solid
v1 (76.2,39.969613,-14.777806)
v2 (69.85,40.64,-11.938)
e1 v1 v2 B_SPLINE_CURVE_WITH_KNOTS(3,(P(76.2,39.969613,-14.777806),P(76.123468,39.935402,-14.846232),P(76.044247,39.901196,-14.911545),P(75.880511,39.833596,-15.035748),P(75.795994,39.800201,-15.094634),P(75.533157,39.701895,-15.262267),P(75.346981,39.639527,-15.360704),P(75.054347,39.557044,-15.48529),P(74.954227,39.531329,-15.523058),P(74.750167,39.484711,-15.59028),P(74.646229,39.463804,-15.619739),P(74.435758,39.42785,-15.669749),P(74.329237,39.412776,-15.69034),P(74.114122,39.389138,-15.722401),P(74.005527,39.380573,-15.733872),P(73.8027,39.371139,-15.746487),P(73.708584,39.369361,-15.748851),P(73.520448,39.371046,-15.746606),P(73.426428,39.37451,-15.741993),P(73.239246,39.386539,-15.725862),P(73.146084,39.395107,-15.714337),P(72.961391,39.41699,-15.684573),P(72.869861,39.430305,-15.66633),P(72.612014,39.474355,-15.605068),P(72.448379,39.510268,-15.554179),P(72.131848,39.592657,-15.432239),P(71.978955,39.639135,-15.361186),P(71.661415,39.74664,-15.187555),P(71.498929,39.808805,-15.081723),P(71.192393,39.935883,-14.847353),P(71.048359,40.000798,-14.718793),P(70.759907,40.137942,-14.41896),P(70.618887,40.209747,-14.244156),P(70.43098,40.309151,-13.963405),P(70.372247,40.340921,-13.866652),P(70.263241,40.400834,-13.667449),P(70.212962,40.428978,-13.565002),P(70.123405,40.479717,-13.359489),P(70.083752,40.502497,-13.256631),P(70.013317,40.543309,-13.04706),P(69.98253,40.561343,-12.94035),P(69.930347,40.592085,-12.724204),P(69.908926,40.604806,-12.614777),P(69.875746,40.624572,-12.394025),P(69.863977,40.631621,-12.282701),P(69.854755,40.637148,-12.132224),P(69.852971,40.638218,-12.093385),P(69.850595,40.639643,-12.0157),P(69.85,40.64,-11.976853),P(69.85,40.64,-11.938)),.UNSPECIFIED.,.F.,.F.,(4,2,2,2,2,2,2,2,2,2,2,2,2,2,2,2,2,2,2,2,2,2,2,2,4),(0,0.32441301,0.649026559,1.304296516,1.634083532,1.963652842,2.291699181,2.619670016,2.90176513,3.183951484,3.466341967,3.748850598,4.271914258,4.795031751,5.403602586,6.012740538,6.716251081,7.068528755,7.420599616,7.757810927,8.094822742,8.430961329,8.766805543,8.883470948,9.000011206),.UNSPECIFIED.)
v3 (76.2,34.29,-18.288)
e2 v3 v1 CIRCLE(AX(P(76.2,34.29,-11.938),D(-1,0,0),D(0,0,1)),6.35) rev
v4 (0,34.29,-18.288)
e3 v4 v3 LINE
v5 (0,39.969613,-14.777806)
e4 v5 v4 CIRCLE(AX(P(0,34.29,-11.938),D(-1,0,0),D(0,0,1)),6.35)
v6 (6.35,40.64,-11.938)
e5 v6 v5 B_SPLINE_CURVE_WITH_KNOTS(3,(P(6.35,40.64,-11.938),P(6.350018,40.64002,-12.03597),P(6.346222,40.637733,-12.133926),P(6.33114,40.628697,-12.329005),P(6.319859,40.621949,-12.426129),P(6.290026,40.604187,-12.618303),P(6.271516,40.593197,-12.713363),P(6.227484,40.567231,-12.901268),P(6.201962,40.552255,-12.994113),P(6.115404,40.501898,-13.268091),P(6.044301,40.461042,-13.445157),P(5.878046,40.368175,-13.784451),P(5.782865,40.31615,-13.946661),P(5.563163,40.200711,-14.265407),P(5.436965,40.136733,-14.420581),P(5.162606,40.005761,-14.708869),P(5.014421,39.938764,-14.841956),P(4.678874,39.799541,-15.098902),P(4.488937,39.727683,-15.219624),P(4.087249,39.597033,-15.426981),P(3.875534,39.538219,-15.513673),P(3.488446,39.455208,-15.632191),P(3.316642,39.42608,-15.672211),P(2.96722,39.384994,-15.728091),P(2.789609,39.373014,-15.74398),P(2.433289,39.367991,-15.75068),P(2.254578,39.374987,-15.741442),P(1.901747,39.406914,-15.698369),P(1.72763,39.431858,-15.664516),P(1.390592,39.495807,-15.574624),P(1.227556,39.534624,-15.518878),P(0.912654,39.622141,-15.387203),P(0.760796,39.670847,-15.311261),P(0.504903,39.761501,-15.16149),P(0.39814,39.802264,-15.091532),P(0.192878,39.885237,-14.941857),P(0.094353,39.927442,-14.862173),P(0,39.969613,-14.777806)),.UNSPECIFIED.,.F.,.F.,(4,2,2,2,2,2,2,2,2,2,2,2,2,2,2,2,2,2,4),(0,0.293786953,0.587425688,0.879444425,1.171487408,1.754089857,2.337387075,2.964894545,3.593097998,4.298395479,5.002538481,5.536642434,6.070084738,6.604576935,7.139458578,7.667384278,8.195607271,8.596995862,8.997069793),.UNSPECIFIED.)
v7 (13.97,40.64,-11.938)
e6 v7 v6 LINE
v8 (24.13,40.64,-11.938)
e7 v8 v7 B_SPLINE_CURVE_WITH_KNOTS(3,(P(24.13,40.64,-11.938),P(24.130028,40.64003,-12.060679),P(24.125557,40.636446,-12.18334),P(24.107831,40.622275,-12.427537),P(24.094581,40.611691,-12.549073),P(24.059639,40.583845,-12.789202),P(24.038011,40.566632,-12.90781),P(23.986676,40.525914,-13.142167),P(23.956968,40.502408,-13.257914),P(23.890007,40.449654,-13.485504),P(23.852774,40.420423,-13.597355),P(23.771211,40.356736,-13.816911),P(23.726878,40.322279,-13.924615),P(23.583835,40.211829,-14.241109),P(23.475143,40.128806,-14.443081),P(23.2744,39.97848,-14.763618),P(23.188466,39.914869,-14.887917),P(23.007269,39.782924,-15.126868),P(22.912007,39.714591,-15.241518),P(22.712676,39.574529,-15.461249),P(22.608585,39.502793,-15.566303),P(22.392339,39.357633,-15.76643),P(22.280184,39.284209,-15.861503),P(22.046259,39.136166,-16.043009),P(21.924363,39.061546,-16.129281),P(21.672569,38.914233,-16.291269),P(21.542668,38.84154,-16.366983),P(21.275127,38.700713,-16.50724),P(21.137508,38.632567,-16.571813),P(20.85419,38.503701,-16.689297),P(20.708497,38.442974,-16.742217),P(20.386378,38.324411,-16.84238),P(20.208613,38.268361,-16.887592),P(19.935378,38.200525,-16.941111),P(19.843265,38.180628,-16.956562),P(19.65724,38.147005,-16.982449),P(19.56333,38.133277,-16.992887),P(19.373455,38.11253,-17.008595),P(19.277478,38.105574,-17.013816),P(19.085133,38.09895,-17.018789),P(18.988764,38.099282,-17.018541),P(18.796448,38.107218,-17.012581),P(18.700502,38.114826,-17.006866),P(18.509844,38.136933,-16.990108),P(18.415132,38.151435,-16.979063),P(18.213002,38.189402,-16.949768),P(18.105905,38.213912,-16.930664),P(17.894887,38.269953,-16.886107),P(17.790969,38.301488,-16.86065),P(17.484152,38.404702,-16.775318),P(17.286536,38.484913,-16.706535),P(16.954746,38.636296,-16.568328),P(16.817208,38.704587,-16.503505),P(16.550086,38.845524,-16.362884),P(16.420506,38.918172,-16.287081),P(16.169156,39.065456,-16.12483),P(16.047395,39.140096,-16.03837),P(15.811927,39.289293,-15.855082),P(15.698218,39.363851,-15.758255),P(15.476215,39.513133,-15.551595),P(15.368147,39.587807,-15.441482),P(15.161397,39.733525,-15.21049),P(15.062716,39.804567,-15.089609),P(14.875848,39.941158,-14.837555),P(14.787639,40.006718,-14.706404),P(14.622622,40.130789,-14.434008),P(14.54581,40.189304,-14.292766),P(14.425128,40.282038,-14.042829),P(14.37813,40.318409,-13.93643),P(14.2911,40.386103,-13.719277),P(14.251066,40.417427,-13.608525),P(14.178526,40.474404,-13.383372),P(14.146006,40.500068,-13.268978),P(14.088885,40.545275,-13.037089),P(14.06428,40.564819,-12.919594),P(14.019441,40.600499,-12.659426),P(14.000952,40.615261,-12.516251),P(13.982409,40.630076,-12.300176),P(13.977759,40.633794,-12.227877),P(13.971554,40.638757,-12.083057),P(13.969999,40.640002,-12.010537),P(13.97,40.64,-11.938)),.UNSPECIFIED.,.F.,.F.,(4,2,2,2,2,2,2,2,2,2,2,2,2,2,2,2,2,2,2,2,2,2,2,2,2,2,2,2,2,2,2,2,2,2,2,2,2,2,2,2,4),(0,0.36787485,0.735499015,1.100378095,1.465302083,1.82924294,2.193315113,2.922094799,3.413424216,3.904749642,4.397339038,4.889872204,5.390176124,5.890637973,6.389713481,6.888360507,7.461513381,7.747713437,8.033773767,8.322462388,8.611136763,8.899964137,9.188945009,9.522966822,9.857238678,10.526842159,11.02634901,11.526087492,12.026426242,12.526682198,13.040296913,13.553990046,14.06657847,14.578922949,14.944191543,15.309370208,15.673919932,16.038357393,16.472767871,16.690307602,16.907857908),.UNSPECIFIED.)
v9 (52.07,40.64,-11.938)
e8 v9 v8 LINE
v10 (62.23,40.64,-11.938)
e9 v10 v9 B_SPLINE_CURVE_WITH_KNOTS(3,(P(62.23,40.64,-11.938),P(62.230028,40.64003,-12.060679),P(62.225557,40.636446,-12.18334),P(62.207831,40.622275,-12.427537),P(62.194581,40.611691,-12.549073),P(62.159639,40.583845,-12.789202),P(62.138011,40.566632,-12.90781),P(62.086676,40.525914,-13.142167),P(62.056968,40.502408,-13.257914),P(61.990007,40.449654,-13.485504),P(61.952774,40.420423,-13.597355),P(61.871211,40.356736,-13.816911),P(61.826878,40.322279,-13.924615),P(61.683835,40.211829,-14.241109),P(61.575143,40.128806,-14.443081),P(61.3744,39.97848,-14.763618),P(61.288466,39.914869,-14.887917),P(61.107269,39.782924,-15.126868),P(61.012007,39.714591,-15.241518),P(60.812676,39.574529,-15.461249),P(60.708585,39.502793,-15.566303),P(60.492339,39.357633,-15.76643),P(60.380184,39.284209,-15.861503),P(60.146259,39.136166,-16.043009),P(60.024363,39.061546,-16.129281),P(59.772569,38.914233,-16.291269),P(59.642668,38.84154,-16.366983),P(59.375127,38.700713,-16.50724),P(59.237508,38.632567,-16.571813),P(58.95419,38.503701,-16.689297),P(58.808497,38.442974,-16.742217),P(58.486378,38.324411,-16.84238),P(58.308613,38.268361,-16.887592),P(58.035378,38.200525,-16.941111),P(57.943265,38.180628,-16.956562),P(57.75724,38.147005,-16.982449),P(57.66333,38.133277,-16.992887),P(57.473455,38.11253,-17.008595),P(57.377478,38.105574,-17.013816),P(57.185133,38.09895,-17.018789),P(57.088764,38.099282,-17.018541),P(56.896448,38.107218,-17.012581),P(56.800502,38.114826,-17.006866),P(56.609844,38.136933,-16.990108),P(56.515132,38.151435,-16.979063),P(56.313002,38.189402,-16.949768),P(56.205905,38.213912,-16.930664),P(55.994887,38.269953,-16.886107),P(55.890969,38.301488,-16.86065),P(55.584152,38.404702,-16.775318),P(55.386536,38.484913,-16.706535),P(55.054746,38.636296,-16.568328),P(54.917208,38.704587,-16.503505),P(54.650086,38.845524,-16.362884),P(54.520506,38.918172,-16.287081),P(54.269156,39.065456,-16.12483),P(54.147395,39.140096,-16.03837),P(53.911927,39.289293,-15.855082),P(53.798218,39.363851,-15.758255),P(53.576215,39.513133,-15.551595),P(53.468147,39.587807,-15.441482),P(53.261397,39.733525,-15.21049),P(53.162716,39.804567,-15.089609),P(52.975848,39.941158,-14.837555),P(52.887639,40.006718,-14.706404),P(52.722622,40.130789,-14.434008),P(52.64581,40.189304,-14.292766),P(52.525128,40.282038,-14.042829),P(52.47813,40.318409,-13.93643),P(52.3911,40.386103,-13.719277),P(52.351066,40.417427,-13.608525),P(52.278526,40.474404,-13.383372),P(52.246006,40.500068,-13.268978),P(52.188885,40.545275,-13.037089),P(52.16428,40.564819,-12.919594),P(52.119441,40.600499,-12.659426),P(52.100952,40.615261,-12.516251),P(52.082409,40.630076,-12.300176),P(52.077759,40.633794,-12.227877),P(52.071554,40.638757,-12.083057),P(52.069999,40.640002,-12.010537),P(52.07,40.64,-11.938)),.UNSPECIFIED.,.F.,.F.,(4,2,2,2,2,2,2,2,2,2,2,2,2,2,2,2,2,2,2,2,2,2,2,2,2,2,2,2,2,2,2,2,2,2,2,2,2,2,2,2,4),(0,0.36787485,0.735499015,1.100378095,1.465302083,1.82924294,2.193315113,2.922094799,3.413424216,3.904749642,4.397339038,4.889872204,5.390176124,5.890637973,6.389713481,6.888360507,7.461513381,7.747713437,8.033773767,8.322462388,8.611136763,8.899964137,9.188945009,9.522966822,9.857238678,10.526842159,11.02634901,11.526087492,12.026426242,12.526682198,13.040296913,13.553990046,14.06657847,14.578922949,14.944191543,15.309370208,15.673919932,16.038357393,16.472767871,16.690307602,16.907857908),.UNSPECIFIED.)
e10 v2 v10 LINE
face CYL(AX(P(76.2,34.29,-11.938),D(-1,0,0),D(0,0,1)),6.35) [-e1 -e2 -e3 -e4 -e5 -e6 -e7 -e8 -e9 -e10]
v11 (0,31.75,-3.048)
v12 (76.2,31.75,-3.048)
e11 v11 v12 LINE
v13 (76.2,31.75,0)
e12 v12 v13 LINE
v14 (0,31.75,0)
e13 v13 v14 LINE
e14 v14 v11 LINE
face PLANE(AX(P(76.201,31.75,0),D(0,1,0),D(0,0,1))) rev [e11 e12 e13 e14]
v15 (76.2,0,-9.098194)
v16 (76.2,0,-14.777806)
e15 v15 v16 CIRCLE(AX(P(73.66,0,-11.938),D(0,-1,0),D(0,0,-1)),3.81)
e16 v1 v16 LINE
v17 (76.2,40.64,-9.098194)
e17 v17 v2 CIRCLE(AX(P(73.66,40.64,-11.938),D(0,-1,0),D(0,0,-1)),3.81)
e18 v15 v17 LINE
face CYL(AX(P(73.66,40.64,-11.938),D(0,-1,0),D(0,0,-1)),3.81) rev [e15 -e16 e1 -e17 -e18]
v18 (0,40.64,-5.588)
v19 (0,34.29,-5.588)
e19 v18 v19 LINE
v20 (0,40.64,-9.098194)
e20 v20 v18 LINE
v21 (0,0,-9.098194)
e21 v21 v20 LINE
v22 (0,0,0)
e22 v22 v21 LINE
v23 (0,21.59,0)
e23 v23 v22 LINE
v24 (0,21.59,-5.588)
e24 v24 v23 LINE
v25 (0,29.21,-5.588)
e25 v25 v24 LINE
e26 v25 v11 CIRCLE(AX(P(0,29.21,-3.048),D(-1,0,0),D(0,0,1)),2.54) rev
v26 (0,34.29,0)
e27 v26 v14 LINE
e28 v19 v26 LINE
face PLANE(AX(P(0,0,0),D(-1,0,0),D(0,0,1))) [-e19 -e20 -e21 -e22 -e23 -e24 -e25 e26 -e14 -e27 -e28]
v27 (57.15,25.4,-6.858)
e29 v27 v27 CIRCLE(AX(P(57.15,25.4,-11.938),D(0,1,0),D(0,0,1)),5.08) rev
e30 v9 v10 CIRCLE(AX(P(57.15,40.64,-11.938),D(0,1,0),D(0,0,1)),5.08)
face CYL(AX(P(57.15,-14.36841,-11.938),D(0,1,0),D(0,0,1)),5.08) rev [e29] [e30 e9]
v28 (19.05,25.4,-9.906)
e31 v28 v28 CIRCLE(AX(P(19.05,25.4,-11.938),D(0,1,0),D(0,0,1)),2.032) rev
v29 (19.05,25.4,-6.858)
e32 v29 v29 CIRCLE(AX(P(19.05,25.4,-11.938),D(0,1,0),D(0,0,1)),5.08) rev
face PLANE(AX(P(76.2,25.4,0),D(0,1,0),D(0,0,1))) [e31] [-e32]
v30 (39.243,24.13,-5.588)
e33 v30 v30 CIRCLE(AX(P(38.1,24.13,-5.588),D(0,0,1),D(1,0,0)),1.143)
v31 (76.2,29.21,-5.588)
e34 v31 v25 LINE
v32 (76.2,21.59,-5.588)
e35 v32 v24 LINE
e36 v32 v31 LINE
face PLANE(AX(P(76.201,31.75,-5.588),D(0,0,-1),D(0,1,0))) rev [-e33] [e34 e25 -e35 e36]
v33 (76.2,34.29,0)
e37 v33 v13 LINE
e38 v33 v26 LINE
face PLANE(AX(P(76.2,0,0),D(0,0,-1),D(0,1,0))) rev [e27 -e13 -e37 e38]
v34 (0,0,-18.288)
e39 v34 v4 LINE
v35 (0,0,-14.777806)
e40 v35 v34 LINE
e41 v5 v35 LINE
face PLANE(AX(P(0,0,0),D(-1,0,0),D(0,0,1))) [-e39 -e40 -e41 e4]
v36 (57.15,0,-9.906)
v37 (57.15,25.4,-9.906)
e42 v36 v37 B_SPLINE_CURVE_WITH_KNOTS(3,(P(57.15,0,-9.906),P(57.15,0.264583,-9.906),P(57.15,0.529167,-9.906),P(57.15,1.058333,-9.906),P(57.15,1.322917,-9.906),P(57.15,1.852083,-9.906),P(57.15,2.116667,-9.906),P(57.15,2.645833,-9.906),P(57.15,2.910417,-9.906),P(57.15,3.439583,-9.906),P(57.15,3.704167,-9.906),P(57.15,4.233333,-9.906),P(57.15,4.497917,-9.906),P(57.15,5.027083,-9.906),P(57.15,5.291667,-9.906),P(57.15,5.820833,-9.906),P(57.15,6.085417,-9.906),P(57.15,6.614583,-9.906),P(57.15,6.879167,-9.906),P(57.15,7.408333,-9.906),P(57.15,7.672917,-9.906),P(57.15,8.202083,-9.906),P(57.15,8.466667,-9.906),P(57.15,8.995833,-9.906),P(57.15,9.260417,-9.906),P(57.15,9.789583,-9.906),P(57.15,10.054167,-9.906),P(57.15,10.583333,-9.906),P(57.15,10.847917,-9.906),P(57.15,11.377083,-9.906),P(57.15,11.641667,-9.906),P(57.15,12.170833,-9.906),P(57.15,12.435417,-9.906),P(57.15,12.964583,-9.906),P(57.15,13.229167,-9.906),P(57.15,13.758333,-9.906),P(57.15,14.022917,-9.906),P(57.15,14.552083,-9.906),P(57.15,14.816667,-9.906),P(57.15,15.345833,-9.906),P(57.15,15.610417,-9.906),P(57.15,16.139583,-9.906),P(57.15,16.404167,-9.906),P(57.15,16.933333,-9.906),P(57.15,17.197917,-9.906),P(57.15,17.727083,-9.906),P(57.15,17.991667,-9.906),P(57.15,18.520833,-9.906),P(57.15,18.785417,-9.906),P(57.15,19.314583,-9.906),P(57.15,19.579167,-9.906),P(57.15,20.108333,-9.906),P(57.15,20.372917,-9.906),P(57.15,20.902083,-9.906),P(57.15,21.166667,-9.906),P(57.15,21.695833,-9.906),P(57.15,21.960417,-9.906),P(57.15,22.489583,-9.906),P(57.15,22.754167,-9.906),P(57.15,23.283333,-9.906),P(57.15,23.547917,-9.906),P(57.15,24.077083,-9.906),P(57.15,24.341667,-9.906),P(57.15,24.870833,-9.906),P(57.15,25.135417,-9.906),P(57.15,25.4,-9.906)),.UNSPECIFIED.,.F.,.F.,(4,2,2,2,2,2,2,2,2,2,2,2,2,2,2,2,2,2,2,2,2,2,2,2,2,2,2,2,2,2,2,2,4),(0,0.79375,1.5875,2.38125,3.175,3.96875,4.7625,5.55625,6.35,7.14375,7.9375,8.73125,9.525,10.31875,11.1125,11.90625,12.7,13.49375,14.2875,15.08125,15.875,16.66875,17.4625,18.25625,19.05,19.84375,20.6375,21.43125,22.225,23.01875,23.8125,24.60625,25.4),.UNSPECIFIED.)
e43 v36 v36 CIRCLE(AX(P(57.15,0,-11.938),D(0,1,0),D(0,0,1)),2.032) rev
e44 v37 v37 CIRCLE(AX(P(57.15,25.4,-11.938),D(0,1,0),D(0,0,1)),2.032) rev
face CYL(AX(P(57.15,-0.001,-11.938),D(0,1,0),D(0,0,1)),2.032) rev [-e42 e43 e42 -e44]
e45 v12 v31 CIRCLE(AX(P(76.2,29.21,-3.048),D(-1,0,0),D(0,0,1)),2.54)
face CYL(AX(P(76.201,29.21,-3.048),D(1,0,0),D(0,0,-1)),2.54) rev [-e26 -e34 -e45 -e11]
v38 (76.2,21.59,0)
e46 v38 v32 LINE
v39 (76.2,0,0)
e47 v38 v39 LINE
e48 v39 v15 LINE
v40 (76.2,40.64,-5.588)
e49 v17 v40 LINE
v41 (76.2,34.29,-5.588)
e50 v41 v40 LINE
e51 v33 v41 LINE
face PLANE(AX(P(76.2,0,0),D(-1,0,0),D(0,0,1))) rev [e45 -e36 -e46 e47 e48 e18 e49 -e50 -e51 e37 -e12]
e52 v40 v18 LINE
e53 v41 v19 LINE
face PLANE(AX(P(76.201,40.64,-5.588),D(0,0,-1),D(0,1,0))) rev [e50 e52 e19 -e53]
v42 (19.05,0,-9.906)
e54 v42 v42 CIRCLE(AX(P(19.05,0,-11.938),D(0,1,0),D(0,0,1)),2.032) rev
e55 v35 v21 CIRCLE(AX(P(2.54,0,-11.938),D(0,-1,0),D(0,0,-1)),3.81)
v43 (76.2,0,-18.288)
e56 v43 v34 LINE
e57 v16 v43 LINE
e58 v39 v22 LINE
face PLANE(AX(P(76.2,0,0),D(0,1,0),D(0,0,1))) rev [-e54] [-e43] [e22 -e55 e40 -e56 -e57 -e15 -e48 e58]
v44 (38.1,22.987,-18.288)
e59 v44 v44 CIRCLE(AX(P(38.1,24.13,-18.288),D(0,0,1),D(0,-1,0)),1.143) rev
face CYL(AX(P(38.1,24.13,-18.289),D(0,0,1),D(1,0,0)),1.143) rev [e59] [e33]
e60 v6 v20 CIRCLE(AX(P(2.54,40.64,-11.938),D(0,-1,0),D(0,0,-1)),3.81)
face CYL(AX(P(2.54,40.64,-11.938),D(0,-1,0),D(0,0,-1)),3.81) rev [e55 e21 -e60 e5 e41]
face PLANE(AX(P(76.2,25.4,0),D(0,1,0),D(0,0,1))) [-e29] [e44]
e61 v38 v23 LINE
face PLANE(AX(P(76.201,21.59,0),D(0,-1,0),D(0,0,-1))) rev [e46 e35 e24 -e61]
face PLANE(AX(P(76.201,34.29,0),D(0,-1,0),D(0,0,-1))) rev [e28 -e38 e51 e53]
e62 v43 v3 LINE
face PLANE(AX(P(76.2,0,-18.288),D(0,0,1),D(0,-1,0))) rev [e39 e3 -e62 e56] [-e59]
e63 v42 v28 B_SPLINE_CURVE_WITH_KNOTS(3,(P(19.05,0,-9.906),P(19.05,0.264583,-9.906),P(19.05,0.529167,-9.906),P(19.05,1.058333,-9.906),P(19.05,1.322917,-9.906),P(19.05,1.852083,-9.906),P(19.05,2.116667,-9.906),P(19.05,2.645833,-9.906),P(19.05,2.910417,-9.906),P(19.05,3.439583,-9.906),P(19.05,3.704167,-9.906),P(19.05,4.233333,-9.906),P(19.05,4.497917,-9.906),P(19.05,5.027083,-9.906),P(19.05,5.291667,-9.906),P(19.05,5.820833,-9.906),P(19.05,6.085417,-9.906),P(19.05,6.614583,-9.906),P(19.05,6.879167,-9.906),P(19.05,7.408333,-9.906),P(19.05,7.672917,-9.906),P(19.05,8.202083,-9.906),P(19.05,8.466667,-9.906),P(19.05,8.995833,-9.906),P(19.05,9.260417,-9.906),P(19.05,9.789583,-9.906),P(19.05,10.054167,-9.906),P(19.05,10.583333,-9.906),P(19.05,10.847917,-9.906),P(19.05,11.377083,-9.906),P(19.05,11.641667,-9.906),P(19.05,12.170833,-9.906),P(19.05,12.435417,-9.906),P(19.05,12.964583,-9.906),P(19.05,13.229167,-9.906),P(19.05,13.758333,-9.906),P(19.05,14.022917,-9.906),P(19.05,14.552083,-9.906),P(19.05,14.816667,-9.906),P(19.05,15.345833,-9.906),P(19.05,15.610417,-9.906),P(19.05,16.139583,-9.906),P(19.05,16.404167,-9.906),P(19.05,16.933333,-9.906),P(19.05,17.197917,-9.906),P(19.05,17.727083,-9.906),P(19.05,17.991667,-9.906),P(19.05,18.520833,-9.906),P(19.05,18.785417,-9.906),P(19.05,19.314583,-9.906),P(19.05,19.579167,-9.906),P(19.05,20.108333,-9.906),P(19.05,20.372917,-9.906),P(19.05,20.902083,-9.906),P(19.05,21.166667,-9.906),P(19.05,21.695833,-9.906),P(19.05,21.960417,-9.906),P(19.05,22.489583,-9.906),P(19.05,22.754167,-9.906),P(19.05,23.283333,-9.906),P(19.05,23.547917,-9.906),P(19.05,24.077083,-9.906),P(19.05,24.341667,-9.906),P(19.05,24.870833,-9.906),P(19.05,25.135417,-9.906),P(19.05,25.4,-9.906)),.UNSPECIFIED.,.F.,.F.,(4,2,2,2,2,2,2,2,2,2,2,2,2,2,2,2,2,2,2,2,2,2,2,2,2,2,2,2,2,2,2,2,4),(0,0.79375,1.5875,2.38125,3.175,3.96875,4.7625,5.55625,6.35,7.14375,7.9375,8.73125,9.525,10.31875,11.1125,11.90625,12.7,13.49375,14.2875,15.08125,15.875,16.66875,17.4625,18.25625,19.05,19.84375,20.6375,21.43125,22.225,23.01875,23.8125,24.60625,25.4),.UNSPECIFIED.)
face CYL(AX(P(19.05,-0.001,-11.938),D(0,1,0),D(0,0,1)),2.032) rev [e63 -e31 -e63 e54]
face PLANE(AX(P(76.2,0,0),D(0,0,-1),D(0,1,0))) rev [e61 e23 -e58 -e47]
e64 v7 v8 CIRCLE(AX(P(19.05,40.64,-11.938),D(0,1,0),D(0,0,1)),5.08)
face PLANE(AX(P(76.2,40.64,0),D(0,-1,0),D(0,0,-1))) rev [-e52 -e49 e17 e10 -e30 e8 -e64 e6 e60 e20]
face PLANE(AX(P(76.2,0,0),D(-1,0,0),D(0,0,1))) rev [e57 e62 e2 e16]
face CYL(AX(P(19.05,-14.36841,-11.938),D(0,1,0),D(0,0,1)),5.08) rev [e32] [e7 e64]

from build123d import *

# Parameters (mm, degrees)
SKETCH2_W           = 18.288
SKETCH2_H           = 40.64
BOSS_EXTRUDE1_DEPTH = 76.2
CUT_EXTRUDE1_REACH  = 90.275
SKETCH3_W           = 5.588
SKETCH3_H           = 6.35
SKETCH3_H_2         = 10.16
CUT_EXTRUDE2_REACH  = 89.289
SKETCH4_R           = 1.143
CUT_EXTRUDE3_REACH  = 90.275
SKETCH5_R           = 2.032
SKETCH6_R           = 5.08
CUT_EXTRUDE4_DEPTH  = 15.24
FILLET1_R           = 6.35
FILLET2_R           = 2.54
SKETCH7_R           = 3.81
CUT_EXTRUDE5_DEPTH  = 89.275141297


with BuildPart() as part:
    # Sketch2 → Boss-Extrude1 (new body)
    with BuildSketch(Plane(origin=(0, 0, 0), x_dir=(0, 0, -1), z_dir=(1, 0, 0))):
        with Locations((9.144, 20.32)):
            Rectangle(SKETCH2_W, SKETCH2_H)
    extrude(amount=BOSS_EXTRUDE1_DEPTH)

    # Sketch3 → Cut-Extrude1 (cut, up to next)
    with BuildSketch(Plane.ZY, mode=Mode.PRIVATE) as cut_extrude1_sk1:
        with Locations((-2.794, 37.465)):
            Rectangle(SKETCH3_W, SKETCH3_H)
    cut_extrude1_tool1 = extrude(cut_extrude1_sk1.sketch, amount=-CUT_EXTRUDE1_REACH, mode=Mode.PRIVATE) & part.part
    # Sketch3 → Cut-Extrude1 (cut, up to next)
    with BuildSketch(Plane.ZY, mode=Mode.PRIVATE) as cut_extrude1_sk2:
        with Locations((-2.794, 26.67)):
            Rectangle(SKETCH3_W, SKETCH3_H_2)
    cut_extrude1_tool2 = extrude(cut_extrude1_sk2.sketch, amount=-CUT_EXTRUDE1_REACH, mode=Mode.PRIVATE) & part.part
    add(cut_extrude1_tool1.solids().sort_by_distance((0, 37.465, -2.794))[0], mode=Mode.SUBTRACT)
    add(cut_extrude1_tool2.solids().sort_by_distance((0, 26.67, -2.794))[0], mode=Mode.SUBTRACT)

    # Sketch4 → Cut-Extrude2 (cut, up to next)
    with BuildSketch(Plane.XY.offset(-5.588), mode=Mode.PRIVATE) as cut_extrude2_sk1:
        with Locations((38.1, 24.13)):
            Circle(SKETCH4_R)
    cut_extrude2_tool1 = extrude(cut_extrude2_sk1.sketch, amount=-CUT_EXTRUDE2_REACH, mode=Mode.PRIVATE) & part.part
    add(cut_extrude2_tool1.solids().sort_by_distance((38.1, 24.13, -5.588))[0], mode=Mode.SUBTRACT)

    # Sketch5 → Cut-Extrude3 (cut, up to next)
    with BuildSketch(Plane(origin=(0, 40.64, 0), x_dir=(1, 0, 0), z_dir=(0, 1, 0)), mode=Mode.PRIVATE) as cut_extrude3_sk1:
        with Locations(Location((57.15, 11.938, 0), (0, 0, 270))):
            Circle(SKETCH5_R)
    cut_extrude3_tool1 = extrude(cut_extrude3_sk1.sketch, amount=-CUT_EXTRUDE3_REACH, mode=Mode.PRIVATE) & part.part
    # Sketch5 → Cut-Extrude3 (cut, up to next)
    with BuildSketch(Plane(origin=(0, 40.64, 0), x_dir=(1, 0, 0), z_dir=(0, 1, 0)), mode=Mode.PRIVATE) as cut_extrude3_sk2:
        with Locations(Location((19.05, 11.938, 0), (0, 0, 270))):
            Circle(SKETCH5_R)
    cut_extrude3_tool2 = extrude(cut_extrude3_sk2.sketch, amount=-CUT_EXTRUDE3_REACH, mode=Mode.PRIVATE) & part.part
    add(cut_extrude3_tool1.solids().sort_by_distance((57.15, 40.64, -11.938))[0], mode=Mode.SUBTRACT)
    add(cut_extrude3_tool2.solids().sort_by_distance((19.05, 40.64, -11.938))[0], mode=Mode.SUBTRACT)

    # Sketch6 → Cut-Extrude4 (cut)
    with BuildSketch(Plane(origin=(0, 40.64, 0), x_dir=(1, 0, 0), z_dir=(0, 1, 0))):
        with Locations(Location((19.05, 11.938, 0), (0, 0, 270))):
            Circle(SKETCH6_R)
        with Locations(Location((57.15, 11.938, 0), (0, 0, 270))):
            Circle(SKETCH6_R)
    extrude(amount=-CUT_EXTRUDE4_DEPTH, mode=Mode.SUBTRACT)

    # Fillet1
    # the kernel refuses this fillet: 6.35 mm, written as the material it takes off along each edge
    with BuildSketch(Plane(origin=(-15.875, 40.64, -18.288), x_dir=(0, -1, 0), z_dir=(1, 0, 0))) as fillet1_piece_1:
        with BuildLine():
            CenterArc((FILLET1_R, -FILLET1_R), FILLET1_R, 90, 90)
            Line((0, -FILLET1_R), (0, 0))
            Line((0, 0), (FILLET1_R, 0))
        make_face()
    extrude(amount=107.95, mode=Mode.SUBTRACT)

    # Fillet2
    fillet2_edges = [part.edges().sort_by_distance(p)[0] for p in [
        (38.1, 31.75, -5.588),
    ]]
    fillet(fillet2_edges, radius=FILLET2_R)

    # Sketch7 → Cut-Extrude5 (cut, through all)
    with BuildSketch(Plane.XZ):
        with Locations((2.54, -11.938)):
            Circle(SKETCH7_R)
        with Locations((73.66, -11.938)):
            Circle(SKETCH7_R)
    extrude(amount=-CUT_EXTRUDE5_DEPTH, mode=Mode.SUBTRACT)


solid = part.part
